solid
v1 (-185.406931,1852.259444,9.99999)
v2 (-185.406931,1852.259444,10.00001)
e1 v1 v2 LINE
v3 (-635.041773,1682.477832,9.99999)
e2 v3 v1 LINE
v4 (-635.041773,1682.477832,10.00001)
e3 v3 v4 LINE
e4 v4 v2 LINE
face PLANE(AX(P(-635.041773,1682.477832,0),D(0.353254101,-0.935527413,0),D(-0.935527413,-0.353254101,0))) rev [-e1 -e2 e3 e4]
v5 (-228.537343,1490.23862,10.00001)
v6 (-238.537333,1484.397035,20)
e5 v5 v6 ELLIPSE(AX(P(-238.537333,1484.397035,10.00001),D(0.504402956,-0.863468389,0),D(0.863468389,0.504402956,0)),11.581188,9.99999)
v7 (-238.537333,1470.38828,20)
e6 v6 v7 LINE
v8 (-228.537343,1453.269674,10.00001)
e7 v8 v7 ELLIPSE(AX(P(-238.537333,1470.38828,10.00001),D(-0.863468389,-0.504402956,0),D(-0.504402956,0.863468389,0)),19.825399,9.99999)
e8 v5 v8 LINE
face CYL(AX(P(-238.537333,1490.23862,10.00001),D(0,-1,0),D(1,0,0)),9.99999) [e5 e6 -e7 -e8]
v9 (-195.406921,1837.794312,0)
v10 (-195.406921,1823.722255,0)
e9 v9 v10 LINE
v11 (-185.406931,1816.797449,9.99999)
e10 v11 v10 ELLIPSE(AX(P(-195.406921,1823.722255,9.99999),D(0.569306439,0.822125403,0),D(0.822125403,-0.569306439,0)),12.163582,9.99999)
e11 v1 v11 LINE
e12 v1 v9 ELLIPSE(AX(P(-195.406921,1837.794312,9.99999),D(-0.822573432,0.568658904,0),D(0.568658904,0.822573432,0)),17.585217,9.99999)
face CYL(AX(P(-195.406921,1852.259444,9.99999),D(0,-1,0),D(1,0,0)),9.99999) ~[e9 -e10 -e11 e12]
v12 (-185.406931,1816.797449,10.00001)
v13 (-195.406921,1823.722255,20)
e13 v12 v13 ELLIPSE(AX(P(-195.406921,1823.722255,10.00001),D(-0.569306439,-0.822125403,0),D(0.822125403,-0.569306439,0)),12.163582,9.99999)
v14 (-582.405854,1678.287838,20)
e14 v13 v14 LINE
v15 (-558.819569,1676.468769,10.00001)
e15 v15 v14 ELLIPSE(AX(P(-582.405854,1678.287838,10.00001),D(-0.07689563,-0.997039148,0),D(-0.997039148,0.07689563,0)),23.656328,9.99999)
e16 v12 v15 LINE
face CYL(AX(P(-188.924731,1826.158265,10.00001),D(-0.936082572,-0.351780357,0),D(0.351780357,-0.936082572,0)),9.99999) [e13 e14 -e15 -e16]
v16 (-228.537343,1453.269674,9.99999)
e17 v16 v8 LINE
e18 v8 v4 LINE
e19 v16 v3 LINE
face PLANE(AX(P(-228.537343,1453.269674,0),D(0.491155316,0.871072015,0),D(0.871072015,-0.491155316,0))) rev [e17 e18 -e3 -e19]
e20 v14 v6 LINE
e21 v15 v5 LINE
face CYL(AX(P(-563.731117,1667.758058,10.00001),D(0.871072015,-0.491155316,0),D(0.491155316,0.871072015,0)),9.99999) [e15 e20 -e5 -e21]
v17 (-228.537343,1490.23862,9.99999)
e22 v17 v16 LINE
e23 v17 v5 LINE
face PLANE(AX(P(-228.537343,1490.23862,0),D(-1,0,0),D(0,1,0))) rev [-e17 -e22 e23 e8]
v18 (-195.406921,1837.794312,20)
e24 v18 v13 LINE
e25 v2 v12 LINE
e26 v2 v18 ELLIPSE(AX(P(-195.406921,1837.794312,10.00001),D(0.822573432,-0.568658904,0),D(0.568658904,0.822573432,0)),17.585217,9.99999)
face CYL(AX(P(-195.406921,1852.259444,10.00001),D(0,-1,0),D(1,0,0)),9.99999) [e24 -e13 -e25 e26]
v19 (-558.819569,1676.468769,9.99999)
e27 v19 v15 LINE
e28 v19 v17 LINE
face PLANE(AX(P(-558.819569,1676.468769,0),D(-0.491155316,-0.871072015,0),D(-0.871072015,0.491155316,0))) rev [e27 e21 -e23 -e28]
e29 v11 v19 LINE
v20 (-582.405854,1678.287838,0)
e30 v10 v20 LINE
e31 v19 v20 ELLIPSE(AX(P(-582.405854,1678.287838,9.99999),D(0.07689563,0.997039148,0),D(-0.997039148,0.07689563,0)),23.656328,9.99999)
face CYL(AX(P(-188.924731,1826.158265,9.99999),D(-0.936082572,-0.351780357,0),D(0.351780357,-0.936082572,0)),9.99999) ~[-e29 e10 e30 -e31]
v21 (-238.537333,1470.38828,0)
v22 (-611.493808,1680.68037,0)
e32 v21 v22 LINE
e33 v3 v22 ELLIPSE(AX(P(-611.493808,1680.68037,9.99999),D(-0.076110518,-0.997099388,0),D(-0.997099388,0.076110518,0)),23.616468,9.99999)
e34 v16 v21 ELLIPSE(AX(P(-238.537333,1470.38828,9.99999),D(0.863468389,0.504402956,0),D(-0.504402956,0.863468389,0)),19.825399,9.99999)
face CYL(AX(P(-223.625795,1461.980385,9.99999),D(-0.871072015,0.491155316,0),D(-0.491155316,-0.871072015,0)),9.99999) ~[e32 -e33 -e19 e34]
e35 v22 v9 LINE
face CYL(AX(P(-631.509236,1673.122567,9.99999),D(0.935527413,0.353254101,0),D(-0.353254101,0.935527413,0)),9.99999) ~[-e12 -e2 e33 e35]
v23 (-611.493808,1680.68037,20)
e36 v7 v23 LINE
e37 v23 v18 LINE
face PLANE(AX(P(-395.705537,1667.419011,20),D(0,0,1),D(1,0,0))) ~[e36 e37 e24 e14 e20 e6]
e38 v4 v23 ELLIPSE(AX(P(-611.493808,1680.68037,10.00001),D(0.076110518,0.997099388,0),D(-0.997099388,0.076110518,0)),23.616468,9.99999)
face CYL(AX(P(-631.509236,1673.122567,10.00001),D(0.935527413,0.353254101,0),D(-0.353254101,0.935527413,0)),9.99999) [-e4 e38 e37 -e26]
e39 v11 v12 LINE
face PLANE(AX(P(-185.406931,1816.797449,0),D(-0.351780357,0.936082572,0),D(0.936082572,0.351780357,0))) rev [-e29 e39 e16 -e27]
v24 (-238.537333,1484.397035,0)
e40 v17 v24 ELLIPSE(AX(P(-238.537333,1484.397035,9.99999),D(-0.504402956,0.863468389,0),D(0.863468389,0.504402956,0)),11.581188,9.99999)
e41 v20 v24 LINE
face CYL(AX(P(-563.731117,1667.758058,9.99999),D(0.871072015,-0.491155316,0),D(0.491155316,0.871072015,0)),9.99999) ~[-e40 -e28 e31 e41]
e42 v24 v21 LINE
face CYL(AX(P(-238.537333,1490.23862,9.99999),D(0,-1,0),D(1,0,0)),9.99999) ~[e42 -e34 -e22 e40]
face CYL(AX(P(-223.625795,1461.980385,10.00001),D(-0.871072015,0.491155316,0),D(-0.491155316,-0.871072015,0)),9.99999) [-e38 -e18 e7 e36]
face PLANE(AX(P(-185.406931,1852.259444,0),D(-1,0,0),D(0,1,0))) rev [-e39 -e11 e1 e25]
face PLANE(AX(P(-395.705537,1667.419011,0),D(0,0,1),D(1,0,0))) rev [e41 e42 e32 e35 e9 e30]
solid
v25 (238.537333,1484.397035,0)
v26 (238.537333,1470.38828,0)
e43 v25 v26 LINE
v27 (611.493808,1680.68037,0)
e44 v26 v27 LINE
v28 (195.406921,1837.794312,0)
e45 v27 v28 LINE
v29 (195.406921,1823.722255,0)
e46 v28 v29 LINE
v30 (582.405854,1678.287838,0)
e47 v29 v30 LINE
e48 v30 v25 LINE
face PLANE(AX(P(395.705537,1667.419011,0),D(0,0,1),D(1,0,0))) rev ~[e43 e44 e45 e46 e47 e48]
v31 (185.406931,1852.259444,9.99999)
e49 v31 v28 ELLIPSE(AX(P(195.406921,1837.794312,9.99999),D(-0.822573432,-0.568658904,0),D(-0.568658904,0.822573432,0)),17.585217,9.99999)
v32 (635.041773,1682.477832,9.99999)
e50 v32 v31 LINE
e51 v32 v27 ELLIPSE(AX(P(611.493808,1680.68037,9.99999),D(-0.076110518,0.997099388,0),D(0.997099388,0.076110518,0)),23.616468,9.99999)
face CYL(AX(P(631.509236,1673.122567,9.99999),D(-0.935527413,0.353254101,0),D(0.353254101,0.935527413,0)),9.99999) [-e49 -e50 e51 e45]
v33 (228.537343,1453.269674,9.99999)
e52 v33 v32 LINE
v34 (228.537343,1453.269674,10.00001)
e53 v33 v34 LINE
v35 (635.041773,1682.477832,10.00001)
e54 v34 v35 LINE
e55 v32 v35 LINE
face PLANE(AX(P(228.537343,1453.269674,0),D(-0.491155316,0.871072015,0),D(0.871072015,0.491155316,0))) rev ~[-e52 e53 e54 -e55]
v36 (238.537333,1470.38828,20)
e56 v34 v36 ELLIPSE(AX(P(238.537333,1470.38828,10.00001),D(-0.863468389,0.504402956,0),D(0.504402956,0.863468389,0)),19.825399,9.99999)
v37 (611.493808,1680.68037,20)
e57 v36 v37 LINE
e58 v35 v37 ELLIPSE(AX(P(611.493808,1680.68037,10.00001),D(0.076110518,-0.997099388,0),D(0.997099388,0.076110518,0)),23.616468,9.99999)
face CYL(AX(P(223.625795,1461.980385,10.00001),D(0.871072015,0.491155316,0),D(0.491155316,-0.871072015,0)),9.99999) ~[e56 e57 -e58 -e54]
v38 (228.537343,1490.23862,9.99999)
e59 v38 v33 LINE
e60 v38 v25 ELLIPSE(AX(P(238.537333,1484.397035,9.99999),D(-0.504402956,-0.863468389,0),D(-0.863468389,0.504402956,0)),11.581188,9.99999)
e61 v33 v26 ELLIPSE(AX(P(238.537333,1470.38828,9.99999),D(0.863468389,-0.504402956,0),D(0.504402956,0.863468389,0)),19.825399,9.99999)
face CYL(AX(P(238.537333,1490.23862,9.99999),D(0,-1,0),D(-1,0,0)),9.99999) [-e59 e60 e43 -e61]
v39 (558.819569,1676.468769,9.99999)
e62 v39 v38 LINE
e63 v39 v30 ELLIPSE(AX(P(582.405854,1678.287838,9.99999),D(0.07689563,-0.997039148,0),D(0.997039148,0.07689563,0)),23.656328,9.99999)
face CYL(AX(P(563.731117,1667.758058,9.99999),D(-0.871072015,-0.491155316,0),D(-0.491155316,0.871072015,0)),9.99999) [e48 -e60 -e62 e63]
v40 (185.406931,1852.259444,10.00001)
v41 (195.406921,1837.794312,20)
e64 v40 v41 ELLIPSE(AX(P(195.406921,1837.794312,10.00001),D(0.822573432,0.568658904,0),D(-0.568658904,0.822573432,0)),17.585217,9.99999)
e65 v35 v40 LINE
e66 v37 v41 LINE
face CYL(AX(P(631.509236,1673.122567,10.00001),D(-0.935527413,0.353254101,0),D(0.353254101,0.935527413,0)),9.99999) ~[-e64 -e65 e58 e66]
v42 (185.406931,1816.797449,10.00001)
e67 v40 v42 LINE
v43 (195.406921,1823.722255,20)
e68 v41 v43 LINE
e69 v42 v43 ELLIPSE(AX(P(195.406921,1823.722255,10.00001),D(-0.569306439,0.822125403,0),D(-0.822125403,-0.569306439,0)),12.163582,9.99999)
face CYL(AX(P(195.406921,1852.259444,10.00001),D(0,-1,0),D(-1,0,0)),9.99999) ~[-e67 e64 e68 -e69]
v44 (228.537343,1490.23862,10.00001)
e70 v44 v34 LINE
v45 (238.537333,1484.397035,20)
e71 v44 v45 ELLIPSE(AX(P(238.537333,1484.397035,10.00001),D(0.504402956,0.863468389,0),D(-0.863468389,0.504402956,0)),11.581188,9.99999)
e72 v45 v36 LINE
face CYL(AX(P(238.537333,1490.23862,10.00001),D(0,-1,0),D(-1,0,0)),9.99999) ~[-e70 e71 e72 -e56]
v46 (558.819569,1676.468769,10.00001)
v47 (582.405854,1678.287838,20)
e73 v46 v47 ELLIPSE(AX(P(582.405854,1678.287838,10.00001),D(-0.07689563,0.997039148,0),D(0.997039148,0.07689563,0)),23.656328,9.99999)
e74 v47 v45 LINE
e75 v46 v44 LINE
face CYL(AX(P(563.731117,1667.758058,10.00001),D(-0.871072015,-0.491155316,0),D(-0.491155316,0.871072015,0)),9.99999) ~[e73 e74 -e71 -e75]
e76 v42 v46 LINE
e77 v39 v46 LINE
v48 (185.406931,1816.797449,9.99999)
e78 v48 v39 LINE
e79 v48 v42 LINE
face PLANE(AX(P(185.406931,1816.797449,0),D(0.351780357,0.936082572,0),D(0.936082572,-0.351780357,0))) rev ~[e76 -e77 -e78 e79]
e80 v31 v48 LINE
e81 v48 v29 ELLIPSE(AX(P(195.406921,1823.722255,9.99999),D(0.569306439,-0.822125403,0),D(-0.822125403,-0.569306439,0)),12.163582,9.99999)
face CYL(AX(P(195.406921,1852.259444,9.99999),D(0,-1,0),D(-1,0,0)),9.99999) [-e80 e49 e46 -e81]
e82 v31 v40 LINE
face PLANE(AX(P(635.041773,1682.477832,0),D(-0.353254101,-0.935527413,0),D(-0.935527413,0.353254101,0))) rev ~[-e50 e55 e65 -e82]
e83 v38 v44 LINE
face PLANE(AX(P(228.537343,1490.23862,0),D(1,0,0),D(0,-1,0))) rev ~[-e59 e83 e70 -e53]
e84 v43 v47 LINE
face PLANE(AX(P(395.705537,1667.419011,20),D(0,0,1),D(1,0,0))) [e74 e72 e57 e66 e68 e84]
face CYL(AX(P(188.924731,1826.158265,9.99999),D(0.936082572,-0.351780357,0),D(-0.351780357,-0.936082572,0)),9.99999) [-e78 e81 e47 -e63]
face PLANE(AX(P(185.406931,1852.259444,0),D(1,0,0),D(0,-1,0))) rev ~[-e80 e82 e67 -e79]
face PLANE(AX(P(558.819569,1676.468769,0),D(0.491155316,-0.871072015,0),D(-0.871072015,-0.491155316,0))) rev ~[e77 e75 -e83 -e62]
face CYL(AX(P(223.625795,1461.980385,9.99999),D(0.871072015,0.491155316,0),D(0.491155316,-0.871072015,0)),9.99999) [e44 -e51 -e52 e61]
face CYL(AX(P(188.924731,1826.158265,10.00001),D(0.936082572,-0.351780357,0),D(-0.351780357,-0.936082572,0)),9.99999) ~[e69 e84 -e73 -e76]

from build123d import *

# Parameters (mm, degrees)
F1_DEPTH = 20
F2_R     = 9.99999


# Not quite as in the source:
# - a fillet or chamfer is up to 0.001 mm smaller than in the source, because OpenCascade refuses the exact size


with BuildPart() as f1:
    # F0 (on Top) → F1 (new body)
    with BuildSketch(Plane.XY):
        Polygon((635.0417733192, 1682.4778318405), (185.4069307446, 1852.2594436146), (185.4069307446, 1816.7974487804), (558.8195690923, 1676.4687693616), (228.5373434424, 1490.2386204266), (228.5373434424, 1453.2696739696), align=None)
    extrude(amount=F1_DEPTH)

    # F2 (radius 10 in the source; OpenCascade refuses exactly that, so slightly less here)
    f2_edges = [f1.edges().sort_by_distance(p)[0] for p in [
        (431.789558, 1567.873753, 20),
        (410.224352, 1767.368638, 20),
        (185.406931, 1834.528446, 20),
        (372.11325, 1746.633109, 20),
        (393.678456, 1583.353695, 20),
        (228.537343, 1471.754147, 20),
        (431.789558, 1567.873753, 0),
        (410.224352, 1767.368638, 0),
        (185.406931, 1834.528446, 0),
        (372.11325, 1746.633109, 0),
        (393.678456, 1583.353695, 0),
        (228.537343, 1471.754147, 0),
    ]]
    fillet(f2_edges, radius=F2_R)


with BuildPart() as f3_1:
    # F3: instance of F1
    add(f1.part.mirror(Plane.YZ))


solid = Compound([f1.part, f3_1.part])
